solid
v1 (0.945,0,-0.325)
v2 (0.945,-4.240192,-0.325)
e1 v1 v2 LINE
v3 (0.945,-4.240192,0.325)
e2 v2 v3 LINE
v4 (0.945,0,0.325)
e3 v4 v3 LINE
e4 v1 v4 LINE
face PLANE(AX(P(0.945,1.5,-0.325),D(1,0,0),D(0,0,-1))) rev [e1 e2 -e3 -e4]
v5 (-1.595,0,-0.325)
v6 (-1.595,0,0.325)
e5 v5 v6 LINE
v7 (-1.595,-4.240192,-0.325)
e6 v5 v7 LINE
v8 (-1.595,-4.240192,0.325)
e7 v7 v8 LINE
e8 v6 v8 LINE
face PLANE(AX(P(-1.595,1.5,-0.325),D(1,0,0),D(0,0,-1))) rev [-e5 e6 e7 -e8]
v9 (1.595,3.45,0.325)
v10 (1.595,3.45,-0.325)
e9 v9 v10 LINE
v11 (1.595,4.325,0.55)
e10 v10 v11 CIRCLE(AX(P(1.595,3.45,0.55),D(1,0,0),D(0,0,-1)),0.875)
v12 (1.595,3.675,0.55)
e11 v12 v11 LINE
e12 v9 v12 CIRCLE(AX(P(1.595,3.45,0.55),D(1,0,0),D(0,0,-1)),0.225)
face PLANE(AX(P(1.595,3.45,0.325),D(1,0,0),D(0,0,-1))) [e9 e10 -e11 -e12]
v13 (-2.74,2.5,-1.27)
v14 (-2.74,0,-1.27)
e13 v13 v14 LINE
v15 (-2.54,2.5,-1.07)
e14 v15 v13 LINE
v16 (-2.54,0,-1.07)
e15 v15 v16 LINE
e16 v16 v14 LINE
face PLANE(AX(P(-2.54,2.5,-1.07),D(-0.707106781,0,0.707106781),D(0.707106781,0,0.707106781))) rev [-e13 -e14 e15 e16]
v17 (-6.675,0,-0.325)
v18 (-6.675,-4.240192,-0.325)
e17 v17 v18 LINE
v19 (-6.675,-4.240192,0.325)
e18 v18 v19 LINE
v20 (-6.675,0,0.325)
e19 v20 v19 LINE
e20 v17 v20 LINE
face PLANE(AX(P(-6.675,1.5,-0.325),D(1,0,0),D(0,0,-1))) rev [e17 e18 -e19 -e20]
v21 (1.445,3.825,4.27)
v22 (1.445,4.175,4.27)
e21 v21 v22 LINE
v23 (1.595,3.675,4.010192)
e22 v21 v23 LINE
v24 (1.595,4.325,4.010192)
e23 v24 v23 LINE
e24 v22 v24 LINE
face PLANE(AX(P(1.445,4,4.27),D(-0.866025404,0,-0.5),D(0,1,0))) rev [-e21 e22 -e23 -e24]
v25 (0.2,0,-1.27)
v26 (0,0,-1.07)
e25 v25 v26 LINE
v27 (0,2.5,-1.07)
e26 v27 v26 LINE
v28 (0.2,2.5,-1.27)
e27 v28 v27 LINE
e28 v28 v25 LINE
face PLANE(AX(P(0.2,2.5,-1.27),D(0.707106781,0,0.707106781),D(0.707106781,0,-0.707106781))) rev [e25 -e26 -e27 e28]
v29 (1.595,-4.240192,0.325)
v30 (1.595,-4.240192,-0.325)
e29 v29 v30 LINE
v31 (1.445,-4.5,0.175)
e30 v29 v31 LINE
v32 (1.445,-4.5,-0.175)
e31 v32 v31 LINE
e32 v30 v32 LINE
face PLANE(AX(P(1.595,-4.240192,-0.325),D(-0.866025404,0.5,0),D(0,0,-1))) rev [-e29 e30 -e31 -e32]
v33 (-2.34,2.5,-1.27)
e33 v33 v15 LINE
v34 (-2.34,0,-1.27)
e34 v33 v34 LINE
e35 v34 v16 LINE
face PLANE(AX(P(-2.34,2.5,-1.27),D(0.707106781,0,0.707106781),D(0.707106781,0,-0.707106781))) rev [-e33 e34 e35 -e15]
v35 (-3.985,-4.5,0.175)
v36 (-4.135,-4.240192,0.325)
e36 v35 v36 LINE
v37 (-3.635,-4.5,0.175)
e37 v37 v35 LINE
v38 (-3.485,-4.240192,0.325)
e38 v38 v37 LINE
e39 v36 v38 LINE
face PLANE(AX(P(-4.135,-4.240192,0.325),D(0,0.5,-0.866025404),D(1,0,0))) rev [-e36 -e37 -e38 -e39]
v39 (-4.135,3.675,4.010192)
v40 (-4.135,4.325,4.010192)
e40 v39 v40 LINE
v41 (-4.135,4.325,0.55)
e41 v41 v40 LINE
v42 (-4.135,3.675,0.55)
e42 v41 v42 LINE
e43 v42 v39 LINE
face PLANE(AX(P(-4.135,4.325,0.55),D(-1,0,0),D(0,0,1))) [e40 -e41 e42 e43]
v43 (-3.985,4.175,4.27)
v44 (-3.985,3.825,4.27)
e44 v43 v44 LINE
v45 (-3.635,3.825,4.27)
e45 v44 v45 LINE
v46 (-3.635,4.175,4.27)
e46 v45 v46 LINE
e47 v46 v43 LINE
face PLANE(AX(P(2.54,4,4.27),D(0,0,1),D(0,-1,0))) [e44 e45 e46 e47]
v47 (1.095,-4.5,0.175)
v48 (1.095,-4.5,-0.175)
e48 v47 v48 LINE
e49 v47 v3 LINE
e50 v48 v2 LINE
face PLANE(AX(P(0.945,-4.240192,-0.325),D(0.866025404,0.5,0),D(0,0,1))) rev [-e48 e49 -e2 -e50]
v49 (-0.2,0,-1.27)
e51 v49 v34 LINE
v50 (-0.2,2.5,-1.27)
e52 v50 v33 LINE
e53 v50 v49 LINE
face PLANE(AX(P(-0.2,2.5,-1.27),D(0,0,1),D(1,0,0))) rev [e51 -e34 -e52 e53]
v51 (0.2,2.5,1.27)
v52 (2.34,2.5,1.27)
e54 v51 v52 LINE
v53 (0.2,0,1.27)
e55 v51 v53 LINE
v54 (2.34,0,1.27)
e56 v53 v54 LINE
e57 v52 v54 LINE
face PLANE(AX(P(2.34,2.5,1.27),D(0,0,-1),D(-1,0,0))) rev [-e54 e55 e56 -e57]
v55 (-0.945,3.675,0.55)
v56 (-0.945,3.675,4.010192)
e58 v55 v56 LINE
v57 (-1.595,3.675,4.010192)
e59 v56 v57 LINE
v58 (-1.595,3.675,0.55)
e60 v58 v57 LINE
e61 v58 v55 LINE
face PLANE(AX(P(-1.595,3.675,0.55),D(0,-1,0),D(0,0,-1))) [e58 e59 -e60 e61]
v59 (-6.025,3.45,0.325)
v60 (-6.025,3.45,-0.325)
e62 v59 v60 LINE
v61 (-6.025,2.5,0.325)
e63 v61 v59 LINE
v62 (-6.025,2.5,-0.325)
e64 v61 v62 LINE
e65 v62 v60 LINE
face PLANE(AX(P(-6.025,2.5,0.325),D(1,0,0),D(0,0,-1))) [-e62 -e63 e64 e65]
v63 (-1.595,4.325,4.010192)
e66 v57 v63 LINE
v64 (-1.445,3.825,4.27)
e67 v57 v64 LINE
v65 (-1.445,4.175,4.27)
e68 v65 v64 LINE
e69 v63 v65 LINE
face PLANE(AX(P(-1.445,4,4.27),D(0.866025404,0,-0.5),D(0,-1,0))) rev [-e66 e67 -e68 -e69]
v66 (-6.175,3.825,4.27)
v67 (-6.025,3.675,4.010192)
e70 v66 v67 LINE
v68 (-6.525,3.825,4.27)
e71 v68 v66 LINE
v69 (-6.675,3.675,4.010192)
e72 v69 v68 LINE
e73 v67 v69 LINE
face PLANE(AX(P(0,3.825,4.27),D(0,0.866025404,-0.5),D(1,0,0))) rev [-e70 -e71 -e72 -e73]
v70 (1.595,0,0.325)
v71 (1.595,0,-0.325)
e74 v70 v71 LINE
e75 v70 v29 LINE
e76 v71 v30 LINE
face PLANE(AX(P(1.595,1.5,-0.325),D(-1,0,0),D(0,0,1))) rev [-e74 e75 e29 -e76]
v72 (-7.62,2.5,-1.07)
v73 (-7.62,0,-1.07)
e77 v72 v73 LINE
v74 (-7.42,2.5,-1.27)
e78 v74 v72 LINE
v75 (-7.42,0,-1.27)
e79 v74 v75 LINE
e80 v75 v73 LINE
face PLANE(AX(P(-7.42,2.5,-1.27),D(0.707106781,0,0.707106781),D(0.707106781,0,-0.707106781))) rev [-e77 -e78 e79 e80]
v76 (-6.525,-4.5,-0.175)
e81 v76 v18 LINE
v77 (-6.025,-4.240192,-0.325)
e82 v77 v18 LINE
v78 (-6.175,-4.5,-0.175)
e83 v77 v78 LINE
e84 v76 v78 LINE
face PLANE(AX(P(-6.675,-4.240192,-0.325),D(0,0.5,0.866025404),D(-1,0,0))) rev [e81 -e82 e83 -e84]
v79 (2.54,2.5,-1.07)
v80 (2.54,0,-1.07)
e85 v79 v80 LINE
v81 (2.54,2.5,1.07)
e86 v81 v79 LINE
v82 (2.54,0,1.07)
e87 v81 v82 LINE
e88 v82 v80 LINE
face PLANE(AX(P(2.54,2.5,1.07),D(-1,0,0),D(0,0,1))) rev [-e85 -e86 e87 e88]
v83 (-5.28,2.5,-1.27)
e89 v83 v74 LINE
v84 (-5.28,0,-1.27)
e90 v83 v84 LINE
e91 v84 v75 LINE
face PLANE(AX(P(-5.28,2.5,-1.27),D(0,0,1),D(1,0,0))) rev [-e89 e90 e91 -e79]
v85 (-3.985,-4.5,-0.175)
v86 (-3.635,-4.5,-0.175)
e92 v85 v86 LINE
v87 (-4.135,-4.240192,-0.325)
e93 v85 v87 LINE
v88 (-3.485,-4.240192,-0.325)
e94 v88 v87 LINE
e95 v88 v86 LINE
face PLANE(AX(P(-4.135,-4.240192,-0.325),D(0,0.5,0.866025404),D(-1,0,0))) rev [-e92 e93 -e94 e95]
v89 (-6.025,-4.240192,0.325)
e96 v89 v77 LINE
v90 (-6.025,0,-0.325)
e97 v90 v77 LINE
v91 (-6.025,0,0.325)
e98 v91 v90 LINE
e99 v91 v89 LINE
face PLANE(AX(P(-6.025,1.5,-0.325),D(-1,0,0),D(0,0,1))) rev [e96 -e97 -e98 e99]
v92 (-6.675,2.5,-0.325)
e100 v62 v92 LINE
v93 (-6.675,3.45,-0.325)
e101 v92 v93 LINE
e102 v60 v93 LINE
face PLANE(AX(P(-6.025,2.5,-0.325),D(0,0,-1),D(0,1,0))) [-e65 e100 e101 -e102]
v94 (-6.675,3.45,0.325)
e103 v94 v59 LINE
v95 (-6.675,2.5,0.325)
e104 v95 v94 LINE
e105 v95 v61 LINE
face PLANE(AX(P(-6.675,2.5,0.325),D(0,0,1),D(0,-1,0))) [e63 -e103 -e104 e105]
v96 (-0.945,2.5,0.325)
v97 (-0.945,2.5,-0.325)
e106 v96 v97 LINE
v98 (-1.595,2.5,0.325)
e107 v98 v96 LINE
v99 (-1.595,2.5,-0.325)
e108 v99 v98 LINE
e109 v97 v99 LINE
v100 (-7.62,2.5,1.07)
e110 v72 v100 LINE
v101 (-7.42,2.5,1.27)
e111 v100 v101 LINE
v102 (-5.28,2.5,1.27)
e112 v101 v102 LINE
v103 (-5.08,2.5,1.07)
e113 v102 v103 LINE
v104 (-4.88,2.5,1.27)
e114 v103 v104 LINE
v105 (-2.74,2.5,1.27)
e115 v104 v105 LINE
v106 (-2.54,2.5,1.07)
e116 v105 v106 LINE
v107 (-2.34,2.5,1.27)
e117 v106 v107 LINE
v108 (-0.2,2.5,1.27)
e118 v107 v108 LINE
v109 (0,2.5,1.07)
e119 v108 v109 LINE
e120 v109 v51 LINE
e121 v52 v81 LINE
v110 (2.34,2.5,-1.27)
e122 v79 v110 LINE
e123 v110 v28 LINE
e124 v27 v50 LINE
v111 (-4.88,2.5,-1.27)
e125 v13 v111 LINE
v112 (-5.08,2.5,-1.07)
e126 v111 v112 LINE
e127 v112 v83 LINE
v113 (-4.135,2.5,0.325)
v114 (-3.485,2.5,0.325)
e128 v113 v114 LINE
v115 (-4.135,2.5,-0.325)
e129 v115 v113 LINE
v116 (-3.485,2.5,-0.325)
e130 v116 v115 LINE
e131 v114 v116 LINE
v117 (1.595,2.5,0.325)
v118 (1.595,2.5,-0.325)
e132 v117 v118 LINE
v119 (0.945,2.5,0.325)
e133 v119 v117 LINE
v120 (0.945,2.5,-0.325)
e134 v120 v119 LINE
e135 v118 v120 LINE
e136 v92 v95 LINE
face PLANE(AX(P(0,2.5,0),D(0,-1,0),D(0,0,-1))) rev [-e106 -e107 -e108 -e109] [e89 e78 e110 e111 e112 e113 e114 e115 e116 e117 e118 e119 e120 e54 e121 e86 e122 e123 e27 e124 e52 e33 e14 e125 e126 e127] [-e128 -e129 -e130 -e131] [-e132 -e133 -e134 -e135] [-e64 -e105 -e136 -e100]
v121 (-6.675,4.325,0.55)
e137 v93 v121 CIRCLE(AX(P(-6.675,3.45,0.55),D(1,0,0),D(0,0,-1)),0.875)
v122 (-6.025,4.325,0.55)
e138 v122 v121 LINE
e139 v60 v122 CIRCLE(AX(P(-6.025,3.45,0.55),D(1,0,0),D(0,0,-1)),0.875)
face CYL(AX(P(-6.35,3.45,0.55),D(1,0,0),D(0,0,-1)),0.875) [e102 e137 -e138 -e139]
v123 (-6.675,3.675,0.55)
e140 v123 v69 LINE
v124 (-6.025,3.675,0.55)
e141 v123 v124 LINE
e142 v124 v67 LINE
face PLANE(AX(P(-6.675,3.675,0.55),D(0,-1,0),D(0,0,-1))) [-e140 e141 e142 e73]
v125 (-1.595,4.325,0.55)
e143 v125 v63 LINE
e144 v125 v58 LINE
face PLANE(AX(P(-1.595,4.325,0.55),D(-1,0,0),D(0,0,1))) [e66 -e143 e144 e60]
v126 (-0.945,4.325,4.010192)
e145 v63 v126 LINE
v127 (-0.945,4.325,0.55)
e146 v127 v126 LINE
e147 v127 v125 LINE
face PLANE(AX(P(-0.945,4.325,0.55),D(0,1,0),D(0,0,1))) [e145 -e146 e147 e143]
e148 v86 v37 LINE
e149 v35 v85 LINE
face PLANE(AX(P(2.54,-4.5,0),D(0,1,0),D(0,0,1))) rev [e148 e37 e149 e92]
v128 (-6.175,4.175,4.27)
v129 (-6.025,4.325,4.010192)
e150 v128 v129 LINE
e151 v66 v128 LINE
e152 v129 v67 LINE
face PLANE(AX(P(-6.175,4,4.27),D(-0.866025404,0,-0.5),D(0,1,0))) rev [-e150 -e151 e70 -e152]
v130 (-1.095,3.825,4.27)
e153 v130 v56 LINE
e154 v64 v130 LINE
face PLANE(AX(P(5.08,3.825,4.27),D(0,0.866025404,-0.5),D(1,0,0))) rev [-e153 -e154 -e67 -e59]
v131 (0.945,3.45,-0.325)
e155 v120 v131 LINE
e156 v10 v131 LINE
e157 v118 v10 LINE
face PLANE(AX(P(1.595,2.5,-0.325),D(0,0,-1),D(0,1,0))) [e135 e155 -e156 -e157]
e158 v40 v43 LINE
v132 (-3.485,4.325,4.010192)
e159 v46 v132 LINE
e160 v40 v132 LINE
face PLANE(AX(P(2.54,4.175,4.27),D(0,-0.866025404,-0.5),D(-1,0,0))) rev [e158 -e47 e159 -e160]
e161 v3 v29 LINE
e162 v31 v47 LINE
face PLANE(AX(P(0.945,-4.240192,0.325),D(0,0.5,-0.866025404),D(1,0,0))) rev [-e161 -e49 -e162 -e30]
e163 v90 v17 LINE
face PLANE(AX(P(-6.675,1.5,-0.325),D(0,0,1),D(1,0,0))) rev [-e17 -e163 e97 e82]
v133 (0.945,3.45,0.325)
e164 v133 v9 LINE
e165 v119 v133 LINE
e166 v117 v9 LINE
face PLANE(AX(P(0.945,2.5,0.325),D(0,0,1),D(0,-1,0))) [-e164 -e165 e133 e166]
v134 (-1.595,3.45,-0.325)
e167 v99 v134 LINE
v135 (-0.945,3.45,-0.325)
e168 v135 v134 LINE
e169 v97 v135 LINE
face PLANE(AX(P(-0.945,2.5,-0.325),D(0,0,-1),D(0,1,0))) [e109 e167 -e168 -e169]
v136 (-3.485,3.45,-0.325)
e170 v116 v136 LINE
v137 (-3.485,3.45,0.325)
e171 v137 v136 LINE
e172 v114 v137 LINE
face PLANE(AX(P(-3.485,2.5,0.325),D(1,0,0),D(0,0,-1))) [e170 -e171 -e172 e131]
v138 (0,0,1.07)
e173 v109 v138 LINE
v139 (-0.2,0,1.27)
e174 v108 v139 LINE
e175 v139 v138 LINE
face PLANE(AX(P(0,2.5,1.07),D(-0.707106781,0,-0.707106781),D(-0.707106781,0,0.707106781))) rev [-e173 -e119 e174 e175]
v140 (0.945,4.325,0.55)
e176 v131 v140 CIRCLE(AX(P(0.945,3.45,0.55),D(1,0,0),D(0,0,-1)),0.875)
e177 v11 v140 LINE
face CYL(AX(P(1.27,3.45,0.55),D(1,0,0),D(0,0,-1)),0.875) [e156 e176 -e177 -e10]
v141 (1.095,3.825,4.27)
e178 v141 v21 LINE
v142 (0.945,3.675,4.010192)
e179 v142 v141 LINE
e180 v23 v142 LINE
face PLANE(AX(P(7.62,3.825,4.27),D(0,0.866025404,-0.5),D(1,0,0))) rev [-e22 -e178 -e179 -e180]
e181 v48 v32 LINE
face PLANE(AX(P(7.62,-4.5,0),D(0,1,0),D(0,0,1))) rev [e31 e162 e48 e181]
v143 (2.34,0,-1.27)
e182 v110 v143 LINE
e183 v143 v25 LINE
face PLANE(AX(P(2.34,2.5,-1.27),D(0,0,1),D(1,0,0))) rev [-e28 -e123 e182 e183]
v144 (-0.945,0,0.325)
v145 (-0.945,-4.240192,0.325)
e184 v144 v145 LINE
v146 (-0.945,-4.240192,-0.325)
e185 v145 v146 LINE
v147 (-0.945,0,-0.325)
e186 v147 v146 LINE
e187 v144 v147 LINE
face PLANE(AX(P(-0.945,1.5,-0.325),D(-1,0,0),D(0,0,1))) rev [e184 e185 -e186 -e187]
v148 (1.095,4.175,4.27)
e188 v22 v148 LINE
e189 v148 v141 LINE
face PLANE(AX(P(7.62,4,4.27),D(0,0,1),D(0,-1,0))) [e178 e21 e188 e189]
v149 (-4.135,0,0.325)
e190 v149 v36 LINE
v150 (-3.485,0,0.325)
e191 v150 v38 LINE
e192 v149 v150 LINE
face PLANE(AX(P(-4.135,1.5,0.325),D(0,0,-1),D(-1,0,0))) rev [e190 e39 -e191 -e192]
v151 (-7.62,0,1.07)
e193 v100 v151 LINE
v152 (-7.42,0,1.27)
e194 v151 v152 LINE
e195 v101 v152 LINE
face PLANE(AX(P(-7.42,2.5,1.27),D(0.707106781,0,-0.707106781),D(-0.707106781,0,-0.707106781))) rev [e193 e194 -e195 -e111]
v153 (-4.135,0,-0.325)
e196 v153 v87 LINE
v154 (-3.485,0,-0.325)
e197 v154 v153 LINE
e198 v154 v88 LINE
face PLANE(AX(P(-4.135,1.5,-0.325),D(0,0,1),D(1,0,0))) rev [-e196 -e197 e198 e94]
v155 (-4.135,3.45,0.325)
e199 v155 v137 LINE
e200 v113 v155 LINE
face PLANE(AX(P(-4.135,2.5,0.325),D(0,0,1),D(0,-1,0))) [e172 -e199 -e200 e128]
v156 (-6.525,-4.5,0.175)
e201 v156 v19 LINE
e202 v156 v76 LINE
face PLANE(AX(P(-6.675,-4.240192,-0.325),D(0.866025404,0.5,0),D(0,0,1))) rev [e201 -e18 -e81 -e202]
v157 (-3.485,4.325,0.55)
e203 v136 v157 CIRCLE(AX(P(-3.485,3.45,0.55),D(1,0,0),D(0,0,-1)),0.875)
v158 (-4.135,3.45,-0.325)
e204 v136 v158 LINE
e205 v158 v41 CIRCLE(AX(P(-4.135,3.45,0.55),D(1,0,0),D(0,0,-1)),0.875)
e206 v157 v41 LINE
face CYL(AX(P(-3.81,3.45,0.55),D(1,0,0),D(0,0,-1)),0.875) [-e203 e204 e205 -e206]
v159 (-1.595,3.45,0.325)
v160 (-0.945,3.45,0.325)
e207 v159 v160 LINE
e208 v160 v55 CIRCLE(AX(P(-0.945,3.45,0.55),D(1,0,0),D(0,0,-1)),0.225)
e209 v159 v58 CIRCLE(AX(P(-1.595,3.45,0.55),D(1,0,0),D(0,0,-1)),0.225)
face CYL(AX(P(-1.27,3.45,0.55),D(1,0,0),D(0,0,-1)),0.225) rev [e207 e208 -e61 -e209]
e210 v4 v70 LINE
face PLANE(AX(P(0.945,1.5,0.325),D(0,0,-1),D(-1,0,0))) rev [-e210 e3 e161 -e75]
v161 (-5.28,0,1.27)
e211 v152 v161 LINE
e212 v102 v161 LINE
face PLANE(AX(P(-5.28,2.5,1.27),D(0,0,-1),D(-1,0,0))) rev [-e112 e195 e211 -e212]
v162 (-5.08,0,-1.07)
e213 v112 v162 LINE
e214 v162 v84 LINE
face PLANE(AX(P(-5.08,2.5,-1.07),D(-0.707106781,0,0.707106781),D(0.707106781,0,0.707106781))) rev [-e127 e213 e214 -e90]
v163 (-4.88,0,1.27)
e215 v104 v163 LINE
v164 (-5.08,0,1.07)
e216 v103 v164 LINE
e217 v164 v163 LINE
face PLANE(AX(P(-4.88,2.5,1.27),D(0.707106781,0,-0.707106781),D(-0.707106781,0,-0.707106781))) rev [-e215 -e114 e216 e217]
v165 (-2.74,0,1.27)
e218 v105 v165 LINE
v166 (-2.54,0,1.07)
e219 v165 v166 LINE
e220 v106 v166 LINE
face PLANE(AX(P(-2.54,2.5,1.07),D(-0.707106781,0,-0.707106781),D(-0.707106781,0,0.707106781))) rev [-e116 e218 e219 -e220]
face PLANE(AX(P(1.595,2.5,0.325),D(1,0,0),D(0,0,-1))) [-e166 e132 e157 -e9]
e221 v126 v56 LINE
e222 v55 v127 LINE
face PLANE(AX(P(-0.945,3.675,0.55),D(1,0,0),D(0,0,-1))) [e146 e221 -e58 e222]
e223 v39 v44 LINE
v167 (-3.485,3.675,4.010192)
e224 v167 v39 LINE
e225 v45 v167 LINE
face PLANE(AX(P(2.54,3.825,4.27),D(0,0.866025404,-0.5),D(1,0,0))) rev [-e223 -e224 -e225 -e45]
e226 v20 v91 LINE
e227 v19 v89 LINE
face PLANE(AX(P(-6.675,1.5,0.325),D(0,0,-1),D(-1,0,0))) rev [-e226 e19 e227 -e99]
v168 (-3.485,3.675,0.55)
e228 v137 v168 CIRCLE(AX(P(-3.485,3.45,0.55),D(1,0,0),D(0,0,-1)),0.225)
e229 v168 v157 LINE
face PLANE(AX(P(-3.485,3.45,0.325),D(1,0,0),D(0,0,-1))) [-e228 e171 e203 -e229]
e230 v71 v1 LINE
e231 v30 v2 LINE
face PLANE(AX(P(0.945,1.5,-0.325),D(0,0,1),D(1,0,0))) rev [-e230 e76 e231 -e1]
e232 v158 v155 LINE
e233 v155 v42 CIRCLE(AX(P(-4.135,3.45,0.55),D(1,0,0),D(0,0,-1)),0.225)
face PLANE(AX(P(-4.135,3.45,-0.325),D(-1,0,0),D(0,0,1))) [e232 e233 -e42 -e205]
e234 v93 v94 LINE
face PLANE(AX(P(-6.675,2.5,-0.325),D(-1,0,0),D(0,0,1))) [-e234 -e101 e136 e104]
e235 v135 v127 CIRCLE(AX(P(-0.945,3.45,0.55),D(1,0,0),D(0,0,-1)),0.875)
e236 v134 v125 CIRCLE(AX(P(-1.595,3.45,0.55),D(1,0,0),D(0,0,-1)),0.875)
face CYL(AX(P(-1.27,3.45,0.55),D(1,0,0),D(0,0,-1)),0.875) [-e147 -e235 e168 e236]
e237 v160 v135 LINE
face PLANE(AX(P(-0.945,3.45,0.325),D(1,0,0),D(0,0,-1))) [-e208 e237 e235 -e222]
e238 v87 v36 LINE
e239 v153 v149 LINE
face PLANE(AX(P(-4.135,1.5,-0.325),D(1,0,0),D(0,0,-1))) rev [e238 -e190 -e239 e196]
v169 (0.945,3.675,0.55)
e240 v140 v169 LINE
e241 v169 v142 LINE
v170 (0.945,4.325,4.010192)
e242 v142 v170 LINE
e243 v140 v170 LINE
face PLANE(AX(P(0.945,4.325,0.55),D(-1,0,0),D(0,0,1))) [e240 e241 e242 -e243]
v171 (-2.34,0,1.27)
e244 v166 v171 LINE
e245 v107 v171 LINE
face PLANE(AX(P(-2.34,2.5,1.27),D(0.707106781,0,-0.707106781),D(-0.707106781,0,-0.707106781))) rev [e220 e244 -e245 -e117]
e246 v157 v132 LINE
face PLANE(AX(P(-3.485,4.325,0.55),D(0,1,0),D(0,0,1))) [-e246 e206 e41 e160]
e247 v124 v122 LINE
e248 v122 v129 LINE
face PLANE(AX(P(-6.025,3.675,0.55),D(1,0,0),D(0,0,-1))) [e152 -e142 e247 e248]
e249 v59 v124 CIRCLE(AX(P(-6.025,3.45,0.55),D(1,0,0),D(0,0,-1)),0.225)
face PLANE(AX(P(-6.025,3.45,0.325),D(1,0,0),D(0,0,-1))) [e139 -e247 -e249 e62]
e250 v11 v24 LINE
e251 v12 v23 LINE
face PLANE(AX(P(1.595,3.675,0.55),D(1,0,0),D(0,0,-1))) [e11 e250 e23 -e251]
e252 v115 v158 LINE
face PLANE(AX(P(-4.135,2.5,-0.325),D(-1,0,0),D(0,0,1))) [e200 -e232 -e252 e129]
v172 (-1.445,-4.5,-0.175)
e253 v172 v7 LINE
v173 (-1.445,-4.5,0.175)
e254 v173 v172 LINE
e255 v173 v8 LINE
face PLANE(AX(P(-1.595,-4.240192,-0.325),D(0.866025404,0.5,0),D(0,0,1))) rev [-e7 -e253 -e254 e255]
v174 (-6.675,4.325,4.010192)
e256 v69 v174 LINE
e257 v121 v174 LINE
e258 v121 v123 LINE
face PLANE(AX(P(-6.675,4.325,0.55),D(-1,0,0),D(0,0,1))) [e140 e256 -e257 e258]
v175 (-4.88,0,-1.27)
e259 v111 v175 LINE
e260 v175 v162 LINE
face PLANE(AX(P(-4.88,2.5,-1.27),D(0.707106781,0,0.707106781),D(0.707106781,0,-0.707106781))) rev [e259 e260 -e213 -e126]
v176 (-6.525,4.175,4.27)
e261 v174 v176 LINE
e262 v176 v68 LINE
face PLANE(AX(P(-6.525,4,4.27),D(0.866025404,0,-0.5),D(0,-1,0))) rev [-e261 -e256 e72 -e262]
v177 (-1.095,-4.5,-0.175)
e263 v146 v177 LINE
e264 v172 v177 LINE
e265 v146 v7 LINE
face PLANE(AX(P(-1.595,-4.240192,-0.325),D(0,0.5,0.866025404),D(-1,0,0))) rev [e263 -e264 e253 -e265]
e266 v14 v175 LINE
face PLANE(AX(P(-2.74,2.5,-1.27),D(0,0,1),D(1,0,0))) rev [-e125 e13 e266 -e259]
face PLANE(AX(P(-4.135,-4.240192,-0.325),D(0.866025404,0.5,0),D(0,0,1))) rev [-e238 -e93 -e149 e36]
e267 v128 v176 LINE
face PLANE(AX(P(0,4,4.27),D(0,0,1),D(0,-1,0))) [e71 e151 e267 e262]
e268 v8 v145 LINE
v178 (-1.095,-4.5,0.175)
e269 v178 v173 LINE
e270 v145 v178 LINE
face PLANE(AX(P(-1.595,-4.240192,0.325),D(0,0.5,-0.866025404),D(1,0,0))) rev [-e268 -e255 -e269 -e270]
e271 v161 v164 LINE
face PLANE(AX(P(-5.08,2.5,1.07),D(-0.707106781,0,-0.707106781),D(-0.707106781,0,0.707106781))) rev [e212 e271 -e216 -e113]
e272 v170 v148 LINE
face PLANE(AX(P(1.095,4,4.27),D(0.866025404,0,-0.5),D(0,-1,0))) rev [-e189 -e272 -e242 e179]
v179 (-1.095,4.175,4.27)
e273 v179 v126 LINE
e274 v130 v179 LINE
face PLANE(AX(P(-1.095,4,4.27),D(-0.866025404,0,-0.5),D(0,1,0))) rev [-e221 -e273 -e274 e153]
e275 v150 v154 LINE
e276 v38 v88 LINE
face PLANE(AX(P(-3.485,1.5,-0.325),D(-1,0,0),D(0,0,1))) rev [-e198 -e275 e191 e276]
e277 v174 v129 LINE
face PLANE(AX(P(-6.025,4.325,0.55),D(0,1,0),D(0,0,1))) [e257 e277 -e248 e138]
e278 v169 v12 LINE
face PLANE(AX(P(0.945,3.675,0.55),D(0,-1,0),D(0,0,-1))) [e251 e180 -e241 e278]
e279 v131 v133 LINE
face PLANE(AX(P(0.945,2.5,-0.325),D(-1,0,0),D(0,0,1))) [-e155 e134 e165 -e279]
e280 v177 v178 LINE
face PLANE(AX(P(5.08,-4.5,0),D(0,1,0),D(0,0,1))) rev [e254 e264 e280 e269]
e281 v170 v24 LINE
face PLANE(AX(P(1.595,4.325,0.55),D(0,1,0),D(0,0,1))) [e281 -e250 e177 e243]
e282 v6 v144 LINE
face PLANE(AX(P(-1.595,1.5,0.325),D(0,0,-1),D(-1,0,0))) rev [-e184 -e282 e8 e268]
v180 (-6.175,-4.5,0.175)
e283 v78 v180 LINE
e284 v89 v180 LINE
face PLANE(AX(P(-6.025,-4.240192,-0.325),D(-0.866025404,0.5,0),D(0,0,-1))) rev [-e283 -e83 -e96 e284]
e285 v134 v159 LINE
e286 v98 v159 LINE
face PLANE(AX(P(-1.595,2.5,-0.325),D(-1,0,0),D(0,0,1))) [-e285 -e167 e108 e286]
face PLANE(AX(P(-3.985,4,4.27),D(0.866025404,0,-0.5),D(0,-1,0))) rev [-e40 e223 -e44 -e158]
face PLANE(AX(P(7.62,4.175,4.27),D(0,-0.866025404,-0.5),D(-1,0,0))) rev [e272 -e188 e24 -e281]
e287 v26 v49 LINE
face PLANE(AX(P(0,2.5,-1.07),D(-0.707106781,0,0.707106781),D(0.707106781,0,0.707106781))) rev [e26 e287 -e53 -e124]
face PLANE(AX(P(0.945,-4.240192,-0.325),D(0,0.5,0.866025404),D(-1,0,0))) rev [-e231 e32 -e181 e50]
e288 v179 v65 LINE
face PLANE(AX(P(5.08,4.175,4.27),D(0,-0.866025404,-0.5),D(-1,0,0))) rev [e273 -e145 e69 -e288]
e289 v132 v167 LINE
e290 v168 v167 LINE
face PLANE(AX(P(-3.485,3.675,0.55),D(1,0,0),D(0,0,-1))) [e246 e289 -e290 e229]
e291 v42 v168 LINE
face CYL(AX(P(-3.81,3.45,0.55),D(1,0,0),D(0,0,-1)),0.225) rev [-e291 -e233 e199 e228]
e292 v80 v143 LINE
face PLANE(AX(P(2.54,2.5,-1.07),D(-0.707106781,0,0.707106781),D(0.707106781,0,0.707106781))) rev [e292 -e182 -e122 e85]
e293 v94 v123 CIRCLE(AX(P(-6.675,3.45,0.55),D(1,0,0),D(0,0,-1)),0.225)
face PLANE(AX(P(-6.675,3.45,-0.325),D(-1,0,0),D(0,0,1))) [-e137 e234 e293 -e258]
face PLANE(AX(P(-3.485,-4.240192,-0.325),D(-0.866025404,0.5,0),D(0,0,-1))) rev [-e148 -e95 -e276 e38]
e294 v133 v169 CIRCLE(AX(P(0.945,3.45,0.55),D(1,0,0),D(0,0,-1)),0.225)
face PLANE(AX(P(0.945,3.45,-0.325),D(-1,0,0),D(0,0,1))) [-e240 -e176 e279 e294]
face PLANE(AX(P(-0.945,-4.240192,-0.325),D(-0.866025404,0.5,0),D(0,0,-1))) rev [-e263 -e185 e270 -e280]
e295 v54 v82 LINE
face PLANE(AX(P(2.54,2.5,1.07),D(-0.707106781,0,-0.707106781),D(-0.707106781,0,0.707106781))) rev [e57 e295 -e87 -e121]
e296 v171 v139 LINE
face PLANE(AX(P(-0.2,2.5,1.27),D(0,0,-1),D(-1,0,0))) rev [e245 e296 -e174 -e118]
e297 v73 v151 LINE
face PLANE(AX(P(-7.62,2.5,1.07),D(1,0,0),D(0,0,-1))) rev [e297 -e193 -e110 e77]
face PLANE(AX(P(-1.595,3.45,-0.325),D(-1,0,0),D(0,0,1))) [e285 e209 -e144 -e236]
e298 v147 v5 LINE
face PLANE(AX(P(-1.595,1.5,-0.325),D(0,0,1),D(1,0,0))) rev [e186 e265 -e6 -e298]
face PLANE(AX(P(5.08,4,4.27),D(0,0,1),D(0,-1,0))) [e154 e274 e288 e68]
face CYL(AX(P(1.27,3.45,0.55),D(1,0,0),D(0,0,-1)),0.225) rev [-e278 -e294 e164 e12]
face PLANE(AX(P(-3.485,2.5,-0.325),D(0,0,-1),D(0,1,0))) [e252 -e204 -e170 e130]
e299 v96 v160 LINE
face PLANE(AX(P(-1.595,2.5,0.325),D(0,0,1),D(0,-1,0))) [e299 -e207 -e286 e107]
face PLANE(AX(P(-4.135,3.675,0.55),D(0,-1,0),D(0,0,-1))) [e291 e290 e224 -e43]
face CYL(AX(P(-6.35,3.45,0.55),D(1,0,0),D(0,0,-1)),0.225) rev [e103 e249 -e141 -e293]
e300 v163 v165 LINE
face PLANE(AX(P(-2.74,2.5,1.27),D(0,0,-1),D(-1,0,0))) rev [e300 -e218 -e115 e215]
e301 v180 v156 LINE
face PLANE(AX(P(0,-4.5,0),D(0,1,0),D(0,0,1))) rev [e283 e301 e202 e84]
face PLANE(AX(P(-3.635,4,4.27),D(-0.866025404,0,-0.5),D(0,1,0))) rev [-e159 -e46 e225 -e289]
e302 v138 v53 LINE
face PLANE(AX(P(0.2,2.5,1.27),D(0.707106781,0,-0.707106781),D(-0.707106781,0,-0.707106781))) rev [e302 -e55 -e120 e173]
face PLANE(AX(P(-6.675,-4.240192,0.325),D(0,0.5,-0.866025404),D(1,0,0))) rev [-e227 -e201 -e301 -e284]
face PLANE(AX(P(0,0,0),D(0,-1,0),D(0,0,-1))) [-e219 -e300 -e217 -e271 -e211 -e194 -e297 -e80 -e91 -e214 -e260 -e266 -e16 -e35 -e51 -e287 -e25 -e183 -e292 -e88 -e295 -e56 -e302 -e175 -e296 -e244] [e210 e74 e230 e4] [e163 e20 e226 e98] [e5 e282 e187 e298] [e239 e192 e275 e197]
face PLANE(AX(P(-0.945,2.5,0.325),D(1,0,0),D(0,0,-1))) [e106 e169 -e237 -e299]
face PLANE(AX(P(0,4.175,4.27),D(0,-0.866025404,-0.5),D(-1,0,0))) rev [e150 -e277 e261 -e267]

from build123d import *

# Parameters (mm, degrees)
BOSS_EXTRUDE1_DEPTH = 2.5
SKETCH3_W           = 0.65
SKETCH3_H           = 0.65
BOSS_EXTRUDE2_DEPTH = 6
SKETCH4_W           = 0.65
SKETCH4_H           = 0.65
CHAMFER3_SIZE       = 0.15
CHAMFER3_SIZE2      = 0.259807621
CHAMFER2_SIZE       = 0.15
CHAMFER2_SIZE2      = 0.259807621
LPATTERN2_START     = -5.08
LPATTERN2_OUTLINE_W = 2.5
LPATTERN2_OUTLINE_H = 2.54
LPATTERN2_DEPTH     = 7.62
LPATTERN2_START_2   = -4.135
LPATTERN2_2_DEPTH   = 0.65
LPATTERN2_START_3   = -1.595
LPATTERN2_3_DEPTH   = 0.65
LPATTERN2_START_4   = 0.945
LPATTERN2_4_DEPTH   = 0.65
LPATTERN2_START_5   = -4.240192379
LPATTERN2_5_DEPTH   = 9.240192379
LPATTERN2_START_6   = -1
LPATTERN2_6_DEPTH   = 2


with BuildPart() as part:
    # Sketch1 → Boss-Extrude1 (new body)
    with BuildSketch(Plane(origin=(0, 0, 0), x_dir=(1, 0, 0), z_dir=(0, 1, 0))):
        Polygon((-7.42, 1.27), (-7.62, 1.07), (-7.62, -1.07), (-7.42, -1.27), (-5.28, -1.27), (-5.08, -1.07), (-5.08, 1.07), (-5.28, 1.27), align=None)
    extrude(amount=BOSS_EXTRUDE1_DEPTH)

    # Sketch3 → Boss-Extrude2 (add)
    with BuildSketch(Plane(origin=(0, -4.5, 0), x_dir=(1, 0, 0), z_dir=(0, 1, 0))):
        with Locations((-6.35, 0)):
            Rectangle(SKETCH3_W, SKETCH3_H)
    extrude(amount=BOSS_EXTRUDE2_DEPTH)

    # Sweep1: sweep along a path in Sketch5
    with BuildLine(Plane.ZY.offset(6.35)) as sweep1_path:
        Line((0, 2.5), (0, 3.45))
        ThreePointArc((0, 3.45), (0.16109127, 3.83890873), (0.55, 4))
        Line((0.55, 4), (4.27, 4))
    # Sketch4 → Sweep1 (sweep)
    with BuildSketch(Plane(origin=(0, 2.5, 0), x_dir=(1, 0, 0), z_dir=(0, 1, 0))):
        with Locations((-6.35, 0)):
            Rectangle(SKETCH4_W, SKETCH4_H)
    sweep(path=sweep1_path.line)

    # Chamfer3
    chamfer3_edges = [part.edges().sort_by_distance(p)[0] for p in [
        (-6.675, 4, 4.27),
        (-6.35, 3.675, 4.27),
        (-6.025, 4, 4.27),
        (-6.35, 4.325, 4.27),
    ]]
    chamfer3_side = [part.faces().sort_by_distance(p)[0] for p in [
        (-6.35, 4, 4.27),
    ]]
    chamfer(chamfer3_edges, length=CHAMFER3_SIZE, length2=CHAMFER3_SIZE2, reference=chamfer3_side[0])

    # Chamfer2
    chamfer2_edges = [part.edges().sort_by_distance(p)[0] for p in [
        (-6.025, -4.5, 0),
        (-6.35, -4.5, -0.325),
        (-6.675, -4.5, 0),
        (-6.35, -4.5, 0.325),
    ]]
    chamfer2_side = [part.faces().sort_by_distance(p)[0] for p in [
        (-6.35, -4.5, 0),
    ]]
    chamfer(chamfer2_edges, length=CHAMFER2_SIZE, length2=CHAMFER2_SIZE2, reference=chamfer2_side[0])

    # LPattern2: read off the stored shape, not the designer's step
    # LPattern2 outline → LPattern2 (add)
    with BuildSketch(Plane.YZ.offset(LPATTERN2_START)):
        with Locations((1.25, 0)):
            Rectangle(LPATTERN2_OUTLINE_W, LPATTERN2_OUTLINE_H)
    extrude(amount=LPATTERN2_DEPTH)

    # LPattern2 2 outline → LPattern2 2 (add)
    with BuildSketch(Plane.YZ.offset(LPATTERN2_START_2)):
        Polygon((0, -0.325), (0, 0.325), (-4.240192379, 0.325), (-4.5, 0.175), (-4.5, -0.175), (-4.240192379, -0.325), align=None)
        with BuildLine():
            Line((3.45, 0.325), (2.5, 0.325))
            Line((2.5, 0.325), (2.5, -0.325))
            Line((2.5, -0.325), (3.45, -0.325))
            ThreePointArc((3.45, -0.325), (4.068718434, -0.068718434), (4.325, 0.55))
            Line((4.325, 0.55), (4.325, 4.010192379))
            Line((4.325, 4.010192379), (4.175, 4.27))
            Line((4.175, 4.27), (3.825, 4.27))
            Line((3.825, 4.27), (3.675, 4.010192379))
            Line((3.675, 4.010192379), (3.675, 0.55))
            ThreePointArc((3.675, 0.55), (3.609099026, 0.390900974), (3.45, 0.325))
        make_face()
    extrude(amount=LPATTERN2_2_DEPTH)

    # LPattern2 3 outline → LPattern2 3 (add)
    with BuildSketch(Plane.YZ.offset(LPATTERN2_START_3)):
        Polygon((0, -0.325), (0, 0.325), (-4.240192379, 0.325), (-4.5, 0.175), (-4.5, -0.175), (-4.240192379, -0.325), align=None)
        with BuildLine():
            Line((3.45, 0.325), (2.5, 0.325))
            Line((2.5, 0.325), (2.5, -0.325))
            Line((2.5, -0.325), (3.45, -0.325))
            ThreePointArc((3.45, -0.325), (4.068718434, -0.068718434), (4.325, 0.55))
            Line((4.325, 0.55), (4.325, 4.010192379))
            Line((4.325, 4.010192379), (4.175, 4.27))
            Line((4.175, 4.27), (3.825, 4.27))
            Line((3.825, 4.27), (3.675, 4.010192379))
            Line((3.675, 4.010192379), (3.675, 0.55))
            ThreePointArc((3.675, 0.55), (3.609099026, 0.390900974), (3.45, 0.325))
        make_face()
    extrude(amount=LPATTERN2_3_DEPTH)

    # LPattern2 4 outline → LPattern2 4 (add)
    with BuildSketch(Plane.YZ.offset(LPATTERN2_START_4)):
        Polygon((0, -0.325), (0, 0.325), (-4.240192379, 0.325), (-4.5, 0.175), (-4.5, -0.175), (-4.240192379, -0.325), align=None)
        with BuildLine():
            Line((3.45, 0.325), (2.5, 0.325))
            Line((2.5, 0.325), (2.5, -0.325))
            Line((2.5, -0.325), (3.45, -0.325))
            ThreePointArc((3.45, -0.325), (4.068718434, -0.068718434), (4.325, 0.55))
            Line((4.325, 0.55), (4.325, 4.010192379))
            Line((4.325, 4.010192379), (4.175, 4.27))
            Line((4.175, 4.27), (3.825, 4.27))
            Line((3.825, 4.27), (3.675, 4.010192379))
            Line((3.675, 4.010192379), (3.675, 0.55))
            ThreePointArc((3.675, 0.55), (3.609099026, 0.390900974), (3.45, 0.325))
        make_face()
    extrude(amount=LPATTERN2_4_DEPTH)

    # LPattern2 5 outline → LPattern2 5 (cut)
    with BuildSketch(Plane(origin=(0, 0, 0), x_dir=(1, 0, 0), z_dir=(0, 1, 0)).offset(LPATTERN2_START_5)):
        Polygon((-5.08, 1.27), (-5.08, 1.07), (-4.88, 1.27), align=None)
        Polygon((-5.08, -1.27), (-4.88, -1.27), (-5.08, -1.07), align=None)
        Polygon((-2.74, -1.27), (-2.34, -1.27), (-2.54, -1.07), align=None)
        Polygon((-0.2, -1.27), (0.2, -1.27), (0, -1.07), align=None)
        Polygon((2.54, -1.27), (2.54, -1.07), (2.34, -1.27), align=None)
        Polygon((2.54, 1.27), (2.34, 1.27), (2.54, 1.07), align=None)
        Polygon((0.2, 1.27), (-0.2, 1.27), (0, 1.07), align=None)
        Polygon((-2.34, 1.27), (-2.74, 1.27), (-2.54, 1.07), align=None)
        Polygon((1.595, -4.27), (1.595, -4.010192379), (1.445, -4.27), align=None)
        Polygon((1.095, -4.27), (0.945, -4.010192379), (0.945, -4.27), align=None)
        Polygon((-0.945, -4.27), (-0.945, -4.010192379), (-1.095, -4.27), align=None)
        Polygon((-1.445, -4.27), (-1.595, -4.010192379), (-1.595, -4.27), align=None)
        Polygon((-3.485, -4.27), (-3.485, -4.010192379), (-3.635, -4.27), align=None)
        Polygon((-3.985, -4.27), (-4.135, -4.010192379), (-4.135, -4.27), align=None)
    extrude(amount=LPATTERN2_5_DEPTH, mode=Mode.SUBTRACT)

    # LPattern2 6 outline → LPattern2 6 (cut)
    with BuildSketch(Plane.XY.offset(LPATTERN2_START_6)):
        Polygon((-3.485, -4.5), (-3.485, -4.240192379), (-3.635, -4.5), align=None)
        Polygon((-4.135, -4.5), (-3.985, -4.5), (-4.135, -4.240192379), align=None)
        Polygon((-0.945, -4.5), (-0.945, -4.240192379), (-1.095, -4.5), align=None)
        Polygon((-1.595, -4.5), (-1.445, -4.5), (-1.595, -4.240192379), align=None)
        Polygon((1.595, -4.5), (1.595, -4.240192379), (1.445, -4.5), align=None)
        Polygon((0.945, -4.5), (1.095, -4.5), (0.945, -4.240192379), align=None)
    extrude(amount=LPATTERN2_6_DEPTH, mode=Mode.SUBTRACT)


solid = part.part
